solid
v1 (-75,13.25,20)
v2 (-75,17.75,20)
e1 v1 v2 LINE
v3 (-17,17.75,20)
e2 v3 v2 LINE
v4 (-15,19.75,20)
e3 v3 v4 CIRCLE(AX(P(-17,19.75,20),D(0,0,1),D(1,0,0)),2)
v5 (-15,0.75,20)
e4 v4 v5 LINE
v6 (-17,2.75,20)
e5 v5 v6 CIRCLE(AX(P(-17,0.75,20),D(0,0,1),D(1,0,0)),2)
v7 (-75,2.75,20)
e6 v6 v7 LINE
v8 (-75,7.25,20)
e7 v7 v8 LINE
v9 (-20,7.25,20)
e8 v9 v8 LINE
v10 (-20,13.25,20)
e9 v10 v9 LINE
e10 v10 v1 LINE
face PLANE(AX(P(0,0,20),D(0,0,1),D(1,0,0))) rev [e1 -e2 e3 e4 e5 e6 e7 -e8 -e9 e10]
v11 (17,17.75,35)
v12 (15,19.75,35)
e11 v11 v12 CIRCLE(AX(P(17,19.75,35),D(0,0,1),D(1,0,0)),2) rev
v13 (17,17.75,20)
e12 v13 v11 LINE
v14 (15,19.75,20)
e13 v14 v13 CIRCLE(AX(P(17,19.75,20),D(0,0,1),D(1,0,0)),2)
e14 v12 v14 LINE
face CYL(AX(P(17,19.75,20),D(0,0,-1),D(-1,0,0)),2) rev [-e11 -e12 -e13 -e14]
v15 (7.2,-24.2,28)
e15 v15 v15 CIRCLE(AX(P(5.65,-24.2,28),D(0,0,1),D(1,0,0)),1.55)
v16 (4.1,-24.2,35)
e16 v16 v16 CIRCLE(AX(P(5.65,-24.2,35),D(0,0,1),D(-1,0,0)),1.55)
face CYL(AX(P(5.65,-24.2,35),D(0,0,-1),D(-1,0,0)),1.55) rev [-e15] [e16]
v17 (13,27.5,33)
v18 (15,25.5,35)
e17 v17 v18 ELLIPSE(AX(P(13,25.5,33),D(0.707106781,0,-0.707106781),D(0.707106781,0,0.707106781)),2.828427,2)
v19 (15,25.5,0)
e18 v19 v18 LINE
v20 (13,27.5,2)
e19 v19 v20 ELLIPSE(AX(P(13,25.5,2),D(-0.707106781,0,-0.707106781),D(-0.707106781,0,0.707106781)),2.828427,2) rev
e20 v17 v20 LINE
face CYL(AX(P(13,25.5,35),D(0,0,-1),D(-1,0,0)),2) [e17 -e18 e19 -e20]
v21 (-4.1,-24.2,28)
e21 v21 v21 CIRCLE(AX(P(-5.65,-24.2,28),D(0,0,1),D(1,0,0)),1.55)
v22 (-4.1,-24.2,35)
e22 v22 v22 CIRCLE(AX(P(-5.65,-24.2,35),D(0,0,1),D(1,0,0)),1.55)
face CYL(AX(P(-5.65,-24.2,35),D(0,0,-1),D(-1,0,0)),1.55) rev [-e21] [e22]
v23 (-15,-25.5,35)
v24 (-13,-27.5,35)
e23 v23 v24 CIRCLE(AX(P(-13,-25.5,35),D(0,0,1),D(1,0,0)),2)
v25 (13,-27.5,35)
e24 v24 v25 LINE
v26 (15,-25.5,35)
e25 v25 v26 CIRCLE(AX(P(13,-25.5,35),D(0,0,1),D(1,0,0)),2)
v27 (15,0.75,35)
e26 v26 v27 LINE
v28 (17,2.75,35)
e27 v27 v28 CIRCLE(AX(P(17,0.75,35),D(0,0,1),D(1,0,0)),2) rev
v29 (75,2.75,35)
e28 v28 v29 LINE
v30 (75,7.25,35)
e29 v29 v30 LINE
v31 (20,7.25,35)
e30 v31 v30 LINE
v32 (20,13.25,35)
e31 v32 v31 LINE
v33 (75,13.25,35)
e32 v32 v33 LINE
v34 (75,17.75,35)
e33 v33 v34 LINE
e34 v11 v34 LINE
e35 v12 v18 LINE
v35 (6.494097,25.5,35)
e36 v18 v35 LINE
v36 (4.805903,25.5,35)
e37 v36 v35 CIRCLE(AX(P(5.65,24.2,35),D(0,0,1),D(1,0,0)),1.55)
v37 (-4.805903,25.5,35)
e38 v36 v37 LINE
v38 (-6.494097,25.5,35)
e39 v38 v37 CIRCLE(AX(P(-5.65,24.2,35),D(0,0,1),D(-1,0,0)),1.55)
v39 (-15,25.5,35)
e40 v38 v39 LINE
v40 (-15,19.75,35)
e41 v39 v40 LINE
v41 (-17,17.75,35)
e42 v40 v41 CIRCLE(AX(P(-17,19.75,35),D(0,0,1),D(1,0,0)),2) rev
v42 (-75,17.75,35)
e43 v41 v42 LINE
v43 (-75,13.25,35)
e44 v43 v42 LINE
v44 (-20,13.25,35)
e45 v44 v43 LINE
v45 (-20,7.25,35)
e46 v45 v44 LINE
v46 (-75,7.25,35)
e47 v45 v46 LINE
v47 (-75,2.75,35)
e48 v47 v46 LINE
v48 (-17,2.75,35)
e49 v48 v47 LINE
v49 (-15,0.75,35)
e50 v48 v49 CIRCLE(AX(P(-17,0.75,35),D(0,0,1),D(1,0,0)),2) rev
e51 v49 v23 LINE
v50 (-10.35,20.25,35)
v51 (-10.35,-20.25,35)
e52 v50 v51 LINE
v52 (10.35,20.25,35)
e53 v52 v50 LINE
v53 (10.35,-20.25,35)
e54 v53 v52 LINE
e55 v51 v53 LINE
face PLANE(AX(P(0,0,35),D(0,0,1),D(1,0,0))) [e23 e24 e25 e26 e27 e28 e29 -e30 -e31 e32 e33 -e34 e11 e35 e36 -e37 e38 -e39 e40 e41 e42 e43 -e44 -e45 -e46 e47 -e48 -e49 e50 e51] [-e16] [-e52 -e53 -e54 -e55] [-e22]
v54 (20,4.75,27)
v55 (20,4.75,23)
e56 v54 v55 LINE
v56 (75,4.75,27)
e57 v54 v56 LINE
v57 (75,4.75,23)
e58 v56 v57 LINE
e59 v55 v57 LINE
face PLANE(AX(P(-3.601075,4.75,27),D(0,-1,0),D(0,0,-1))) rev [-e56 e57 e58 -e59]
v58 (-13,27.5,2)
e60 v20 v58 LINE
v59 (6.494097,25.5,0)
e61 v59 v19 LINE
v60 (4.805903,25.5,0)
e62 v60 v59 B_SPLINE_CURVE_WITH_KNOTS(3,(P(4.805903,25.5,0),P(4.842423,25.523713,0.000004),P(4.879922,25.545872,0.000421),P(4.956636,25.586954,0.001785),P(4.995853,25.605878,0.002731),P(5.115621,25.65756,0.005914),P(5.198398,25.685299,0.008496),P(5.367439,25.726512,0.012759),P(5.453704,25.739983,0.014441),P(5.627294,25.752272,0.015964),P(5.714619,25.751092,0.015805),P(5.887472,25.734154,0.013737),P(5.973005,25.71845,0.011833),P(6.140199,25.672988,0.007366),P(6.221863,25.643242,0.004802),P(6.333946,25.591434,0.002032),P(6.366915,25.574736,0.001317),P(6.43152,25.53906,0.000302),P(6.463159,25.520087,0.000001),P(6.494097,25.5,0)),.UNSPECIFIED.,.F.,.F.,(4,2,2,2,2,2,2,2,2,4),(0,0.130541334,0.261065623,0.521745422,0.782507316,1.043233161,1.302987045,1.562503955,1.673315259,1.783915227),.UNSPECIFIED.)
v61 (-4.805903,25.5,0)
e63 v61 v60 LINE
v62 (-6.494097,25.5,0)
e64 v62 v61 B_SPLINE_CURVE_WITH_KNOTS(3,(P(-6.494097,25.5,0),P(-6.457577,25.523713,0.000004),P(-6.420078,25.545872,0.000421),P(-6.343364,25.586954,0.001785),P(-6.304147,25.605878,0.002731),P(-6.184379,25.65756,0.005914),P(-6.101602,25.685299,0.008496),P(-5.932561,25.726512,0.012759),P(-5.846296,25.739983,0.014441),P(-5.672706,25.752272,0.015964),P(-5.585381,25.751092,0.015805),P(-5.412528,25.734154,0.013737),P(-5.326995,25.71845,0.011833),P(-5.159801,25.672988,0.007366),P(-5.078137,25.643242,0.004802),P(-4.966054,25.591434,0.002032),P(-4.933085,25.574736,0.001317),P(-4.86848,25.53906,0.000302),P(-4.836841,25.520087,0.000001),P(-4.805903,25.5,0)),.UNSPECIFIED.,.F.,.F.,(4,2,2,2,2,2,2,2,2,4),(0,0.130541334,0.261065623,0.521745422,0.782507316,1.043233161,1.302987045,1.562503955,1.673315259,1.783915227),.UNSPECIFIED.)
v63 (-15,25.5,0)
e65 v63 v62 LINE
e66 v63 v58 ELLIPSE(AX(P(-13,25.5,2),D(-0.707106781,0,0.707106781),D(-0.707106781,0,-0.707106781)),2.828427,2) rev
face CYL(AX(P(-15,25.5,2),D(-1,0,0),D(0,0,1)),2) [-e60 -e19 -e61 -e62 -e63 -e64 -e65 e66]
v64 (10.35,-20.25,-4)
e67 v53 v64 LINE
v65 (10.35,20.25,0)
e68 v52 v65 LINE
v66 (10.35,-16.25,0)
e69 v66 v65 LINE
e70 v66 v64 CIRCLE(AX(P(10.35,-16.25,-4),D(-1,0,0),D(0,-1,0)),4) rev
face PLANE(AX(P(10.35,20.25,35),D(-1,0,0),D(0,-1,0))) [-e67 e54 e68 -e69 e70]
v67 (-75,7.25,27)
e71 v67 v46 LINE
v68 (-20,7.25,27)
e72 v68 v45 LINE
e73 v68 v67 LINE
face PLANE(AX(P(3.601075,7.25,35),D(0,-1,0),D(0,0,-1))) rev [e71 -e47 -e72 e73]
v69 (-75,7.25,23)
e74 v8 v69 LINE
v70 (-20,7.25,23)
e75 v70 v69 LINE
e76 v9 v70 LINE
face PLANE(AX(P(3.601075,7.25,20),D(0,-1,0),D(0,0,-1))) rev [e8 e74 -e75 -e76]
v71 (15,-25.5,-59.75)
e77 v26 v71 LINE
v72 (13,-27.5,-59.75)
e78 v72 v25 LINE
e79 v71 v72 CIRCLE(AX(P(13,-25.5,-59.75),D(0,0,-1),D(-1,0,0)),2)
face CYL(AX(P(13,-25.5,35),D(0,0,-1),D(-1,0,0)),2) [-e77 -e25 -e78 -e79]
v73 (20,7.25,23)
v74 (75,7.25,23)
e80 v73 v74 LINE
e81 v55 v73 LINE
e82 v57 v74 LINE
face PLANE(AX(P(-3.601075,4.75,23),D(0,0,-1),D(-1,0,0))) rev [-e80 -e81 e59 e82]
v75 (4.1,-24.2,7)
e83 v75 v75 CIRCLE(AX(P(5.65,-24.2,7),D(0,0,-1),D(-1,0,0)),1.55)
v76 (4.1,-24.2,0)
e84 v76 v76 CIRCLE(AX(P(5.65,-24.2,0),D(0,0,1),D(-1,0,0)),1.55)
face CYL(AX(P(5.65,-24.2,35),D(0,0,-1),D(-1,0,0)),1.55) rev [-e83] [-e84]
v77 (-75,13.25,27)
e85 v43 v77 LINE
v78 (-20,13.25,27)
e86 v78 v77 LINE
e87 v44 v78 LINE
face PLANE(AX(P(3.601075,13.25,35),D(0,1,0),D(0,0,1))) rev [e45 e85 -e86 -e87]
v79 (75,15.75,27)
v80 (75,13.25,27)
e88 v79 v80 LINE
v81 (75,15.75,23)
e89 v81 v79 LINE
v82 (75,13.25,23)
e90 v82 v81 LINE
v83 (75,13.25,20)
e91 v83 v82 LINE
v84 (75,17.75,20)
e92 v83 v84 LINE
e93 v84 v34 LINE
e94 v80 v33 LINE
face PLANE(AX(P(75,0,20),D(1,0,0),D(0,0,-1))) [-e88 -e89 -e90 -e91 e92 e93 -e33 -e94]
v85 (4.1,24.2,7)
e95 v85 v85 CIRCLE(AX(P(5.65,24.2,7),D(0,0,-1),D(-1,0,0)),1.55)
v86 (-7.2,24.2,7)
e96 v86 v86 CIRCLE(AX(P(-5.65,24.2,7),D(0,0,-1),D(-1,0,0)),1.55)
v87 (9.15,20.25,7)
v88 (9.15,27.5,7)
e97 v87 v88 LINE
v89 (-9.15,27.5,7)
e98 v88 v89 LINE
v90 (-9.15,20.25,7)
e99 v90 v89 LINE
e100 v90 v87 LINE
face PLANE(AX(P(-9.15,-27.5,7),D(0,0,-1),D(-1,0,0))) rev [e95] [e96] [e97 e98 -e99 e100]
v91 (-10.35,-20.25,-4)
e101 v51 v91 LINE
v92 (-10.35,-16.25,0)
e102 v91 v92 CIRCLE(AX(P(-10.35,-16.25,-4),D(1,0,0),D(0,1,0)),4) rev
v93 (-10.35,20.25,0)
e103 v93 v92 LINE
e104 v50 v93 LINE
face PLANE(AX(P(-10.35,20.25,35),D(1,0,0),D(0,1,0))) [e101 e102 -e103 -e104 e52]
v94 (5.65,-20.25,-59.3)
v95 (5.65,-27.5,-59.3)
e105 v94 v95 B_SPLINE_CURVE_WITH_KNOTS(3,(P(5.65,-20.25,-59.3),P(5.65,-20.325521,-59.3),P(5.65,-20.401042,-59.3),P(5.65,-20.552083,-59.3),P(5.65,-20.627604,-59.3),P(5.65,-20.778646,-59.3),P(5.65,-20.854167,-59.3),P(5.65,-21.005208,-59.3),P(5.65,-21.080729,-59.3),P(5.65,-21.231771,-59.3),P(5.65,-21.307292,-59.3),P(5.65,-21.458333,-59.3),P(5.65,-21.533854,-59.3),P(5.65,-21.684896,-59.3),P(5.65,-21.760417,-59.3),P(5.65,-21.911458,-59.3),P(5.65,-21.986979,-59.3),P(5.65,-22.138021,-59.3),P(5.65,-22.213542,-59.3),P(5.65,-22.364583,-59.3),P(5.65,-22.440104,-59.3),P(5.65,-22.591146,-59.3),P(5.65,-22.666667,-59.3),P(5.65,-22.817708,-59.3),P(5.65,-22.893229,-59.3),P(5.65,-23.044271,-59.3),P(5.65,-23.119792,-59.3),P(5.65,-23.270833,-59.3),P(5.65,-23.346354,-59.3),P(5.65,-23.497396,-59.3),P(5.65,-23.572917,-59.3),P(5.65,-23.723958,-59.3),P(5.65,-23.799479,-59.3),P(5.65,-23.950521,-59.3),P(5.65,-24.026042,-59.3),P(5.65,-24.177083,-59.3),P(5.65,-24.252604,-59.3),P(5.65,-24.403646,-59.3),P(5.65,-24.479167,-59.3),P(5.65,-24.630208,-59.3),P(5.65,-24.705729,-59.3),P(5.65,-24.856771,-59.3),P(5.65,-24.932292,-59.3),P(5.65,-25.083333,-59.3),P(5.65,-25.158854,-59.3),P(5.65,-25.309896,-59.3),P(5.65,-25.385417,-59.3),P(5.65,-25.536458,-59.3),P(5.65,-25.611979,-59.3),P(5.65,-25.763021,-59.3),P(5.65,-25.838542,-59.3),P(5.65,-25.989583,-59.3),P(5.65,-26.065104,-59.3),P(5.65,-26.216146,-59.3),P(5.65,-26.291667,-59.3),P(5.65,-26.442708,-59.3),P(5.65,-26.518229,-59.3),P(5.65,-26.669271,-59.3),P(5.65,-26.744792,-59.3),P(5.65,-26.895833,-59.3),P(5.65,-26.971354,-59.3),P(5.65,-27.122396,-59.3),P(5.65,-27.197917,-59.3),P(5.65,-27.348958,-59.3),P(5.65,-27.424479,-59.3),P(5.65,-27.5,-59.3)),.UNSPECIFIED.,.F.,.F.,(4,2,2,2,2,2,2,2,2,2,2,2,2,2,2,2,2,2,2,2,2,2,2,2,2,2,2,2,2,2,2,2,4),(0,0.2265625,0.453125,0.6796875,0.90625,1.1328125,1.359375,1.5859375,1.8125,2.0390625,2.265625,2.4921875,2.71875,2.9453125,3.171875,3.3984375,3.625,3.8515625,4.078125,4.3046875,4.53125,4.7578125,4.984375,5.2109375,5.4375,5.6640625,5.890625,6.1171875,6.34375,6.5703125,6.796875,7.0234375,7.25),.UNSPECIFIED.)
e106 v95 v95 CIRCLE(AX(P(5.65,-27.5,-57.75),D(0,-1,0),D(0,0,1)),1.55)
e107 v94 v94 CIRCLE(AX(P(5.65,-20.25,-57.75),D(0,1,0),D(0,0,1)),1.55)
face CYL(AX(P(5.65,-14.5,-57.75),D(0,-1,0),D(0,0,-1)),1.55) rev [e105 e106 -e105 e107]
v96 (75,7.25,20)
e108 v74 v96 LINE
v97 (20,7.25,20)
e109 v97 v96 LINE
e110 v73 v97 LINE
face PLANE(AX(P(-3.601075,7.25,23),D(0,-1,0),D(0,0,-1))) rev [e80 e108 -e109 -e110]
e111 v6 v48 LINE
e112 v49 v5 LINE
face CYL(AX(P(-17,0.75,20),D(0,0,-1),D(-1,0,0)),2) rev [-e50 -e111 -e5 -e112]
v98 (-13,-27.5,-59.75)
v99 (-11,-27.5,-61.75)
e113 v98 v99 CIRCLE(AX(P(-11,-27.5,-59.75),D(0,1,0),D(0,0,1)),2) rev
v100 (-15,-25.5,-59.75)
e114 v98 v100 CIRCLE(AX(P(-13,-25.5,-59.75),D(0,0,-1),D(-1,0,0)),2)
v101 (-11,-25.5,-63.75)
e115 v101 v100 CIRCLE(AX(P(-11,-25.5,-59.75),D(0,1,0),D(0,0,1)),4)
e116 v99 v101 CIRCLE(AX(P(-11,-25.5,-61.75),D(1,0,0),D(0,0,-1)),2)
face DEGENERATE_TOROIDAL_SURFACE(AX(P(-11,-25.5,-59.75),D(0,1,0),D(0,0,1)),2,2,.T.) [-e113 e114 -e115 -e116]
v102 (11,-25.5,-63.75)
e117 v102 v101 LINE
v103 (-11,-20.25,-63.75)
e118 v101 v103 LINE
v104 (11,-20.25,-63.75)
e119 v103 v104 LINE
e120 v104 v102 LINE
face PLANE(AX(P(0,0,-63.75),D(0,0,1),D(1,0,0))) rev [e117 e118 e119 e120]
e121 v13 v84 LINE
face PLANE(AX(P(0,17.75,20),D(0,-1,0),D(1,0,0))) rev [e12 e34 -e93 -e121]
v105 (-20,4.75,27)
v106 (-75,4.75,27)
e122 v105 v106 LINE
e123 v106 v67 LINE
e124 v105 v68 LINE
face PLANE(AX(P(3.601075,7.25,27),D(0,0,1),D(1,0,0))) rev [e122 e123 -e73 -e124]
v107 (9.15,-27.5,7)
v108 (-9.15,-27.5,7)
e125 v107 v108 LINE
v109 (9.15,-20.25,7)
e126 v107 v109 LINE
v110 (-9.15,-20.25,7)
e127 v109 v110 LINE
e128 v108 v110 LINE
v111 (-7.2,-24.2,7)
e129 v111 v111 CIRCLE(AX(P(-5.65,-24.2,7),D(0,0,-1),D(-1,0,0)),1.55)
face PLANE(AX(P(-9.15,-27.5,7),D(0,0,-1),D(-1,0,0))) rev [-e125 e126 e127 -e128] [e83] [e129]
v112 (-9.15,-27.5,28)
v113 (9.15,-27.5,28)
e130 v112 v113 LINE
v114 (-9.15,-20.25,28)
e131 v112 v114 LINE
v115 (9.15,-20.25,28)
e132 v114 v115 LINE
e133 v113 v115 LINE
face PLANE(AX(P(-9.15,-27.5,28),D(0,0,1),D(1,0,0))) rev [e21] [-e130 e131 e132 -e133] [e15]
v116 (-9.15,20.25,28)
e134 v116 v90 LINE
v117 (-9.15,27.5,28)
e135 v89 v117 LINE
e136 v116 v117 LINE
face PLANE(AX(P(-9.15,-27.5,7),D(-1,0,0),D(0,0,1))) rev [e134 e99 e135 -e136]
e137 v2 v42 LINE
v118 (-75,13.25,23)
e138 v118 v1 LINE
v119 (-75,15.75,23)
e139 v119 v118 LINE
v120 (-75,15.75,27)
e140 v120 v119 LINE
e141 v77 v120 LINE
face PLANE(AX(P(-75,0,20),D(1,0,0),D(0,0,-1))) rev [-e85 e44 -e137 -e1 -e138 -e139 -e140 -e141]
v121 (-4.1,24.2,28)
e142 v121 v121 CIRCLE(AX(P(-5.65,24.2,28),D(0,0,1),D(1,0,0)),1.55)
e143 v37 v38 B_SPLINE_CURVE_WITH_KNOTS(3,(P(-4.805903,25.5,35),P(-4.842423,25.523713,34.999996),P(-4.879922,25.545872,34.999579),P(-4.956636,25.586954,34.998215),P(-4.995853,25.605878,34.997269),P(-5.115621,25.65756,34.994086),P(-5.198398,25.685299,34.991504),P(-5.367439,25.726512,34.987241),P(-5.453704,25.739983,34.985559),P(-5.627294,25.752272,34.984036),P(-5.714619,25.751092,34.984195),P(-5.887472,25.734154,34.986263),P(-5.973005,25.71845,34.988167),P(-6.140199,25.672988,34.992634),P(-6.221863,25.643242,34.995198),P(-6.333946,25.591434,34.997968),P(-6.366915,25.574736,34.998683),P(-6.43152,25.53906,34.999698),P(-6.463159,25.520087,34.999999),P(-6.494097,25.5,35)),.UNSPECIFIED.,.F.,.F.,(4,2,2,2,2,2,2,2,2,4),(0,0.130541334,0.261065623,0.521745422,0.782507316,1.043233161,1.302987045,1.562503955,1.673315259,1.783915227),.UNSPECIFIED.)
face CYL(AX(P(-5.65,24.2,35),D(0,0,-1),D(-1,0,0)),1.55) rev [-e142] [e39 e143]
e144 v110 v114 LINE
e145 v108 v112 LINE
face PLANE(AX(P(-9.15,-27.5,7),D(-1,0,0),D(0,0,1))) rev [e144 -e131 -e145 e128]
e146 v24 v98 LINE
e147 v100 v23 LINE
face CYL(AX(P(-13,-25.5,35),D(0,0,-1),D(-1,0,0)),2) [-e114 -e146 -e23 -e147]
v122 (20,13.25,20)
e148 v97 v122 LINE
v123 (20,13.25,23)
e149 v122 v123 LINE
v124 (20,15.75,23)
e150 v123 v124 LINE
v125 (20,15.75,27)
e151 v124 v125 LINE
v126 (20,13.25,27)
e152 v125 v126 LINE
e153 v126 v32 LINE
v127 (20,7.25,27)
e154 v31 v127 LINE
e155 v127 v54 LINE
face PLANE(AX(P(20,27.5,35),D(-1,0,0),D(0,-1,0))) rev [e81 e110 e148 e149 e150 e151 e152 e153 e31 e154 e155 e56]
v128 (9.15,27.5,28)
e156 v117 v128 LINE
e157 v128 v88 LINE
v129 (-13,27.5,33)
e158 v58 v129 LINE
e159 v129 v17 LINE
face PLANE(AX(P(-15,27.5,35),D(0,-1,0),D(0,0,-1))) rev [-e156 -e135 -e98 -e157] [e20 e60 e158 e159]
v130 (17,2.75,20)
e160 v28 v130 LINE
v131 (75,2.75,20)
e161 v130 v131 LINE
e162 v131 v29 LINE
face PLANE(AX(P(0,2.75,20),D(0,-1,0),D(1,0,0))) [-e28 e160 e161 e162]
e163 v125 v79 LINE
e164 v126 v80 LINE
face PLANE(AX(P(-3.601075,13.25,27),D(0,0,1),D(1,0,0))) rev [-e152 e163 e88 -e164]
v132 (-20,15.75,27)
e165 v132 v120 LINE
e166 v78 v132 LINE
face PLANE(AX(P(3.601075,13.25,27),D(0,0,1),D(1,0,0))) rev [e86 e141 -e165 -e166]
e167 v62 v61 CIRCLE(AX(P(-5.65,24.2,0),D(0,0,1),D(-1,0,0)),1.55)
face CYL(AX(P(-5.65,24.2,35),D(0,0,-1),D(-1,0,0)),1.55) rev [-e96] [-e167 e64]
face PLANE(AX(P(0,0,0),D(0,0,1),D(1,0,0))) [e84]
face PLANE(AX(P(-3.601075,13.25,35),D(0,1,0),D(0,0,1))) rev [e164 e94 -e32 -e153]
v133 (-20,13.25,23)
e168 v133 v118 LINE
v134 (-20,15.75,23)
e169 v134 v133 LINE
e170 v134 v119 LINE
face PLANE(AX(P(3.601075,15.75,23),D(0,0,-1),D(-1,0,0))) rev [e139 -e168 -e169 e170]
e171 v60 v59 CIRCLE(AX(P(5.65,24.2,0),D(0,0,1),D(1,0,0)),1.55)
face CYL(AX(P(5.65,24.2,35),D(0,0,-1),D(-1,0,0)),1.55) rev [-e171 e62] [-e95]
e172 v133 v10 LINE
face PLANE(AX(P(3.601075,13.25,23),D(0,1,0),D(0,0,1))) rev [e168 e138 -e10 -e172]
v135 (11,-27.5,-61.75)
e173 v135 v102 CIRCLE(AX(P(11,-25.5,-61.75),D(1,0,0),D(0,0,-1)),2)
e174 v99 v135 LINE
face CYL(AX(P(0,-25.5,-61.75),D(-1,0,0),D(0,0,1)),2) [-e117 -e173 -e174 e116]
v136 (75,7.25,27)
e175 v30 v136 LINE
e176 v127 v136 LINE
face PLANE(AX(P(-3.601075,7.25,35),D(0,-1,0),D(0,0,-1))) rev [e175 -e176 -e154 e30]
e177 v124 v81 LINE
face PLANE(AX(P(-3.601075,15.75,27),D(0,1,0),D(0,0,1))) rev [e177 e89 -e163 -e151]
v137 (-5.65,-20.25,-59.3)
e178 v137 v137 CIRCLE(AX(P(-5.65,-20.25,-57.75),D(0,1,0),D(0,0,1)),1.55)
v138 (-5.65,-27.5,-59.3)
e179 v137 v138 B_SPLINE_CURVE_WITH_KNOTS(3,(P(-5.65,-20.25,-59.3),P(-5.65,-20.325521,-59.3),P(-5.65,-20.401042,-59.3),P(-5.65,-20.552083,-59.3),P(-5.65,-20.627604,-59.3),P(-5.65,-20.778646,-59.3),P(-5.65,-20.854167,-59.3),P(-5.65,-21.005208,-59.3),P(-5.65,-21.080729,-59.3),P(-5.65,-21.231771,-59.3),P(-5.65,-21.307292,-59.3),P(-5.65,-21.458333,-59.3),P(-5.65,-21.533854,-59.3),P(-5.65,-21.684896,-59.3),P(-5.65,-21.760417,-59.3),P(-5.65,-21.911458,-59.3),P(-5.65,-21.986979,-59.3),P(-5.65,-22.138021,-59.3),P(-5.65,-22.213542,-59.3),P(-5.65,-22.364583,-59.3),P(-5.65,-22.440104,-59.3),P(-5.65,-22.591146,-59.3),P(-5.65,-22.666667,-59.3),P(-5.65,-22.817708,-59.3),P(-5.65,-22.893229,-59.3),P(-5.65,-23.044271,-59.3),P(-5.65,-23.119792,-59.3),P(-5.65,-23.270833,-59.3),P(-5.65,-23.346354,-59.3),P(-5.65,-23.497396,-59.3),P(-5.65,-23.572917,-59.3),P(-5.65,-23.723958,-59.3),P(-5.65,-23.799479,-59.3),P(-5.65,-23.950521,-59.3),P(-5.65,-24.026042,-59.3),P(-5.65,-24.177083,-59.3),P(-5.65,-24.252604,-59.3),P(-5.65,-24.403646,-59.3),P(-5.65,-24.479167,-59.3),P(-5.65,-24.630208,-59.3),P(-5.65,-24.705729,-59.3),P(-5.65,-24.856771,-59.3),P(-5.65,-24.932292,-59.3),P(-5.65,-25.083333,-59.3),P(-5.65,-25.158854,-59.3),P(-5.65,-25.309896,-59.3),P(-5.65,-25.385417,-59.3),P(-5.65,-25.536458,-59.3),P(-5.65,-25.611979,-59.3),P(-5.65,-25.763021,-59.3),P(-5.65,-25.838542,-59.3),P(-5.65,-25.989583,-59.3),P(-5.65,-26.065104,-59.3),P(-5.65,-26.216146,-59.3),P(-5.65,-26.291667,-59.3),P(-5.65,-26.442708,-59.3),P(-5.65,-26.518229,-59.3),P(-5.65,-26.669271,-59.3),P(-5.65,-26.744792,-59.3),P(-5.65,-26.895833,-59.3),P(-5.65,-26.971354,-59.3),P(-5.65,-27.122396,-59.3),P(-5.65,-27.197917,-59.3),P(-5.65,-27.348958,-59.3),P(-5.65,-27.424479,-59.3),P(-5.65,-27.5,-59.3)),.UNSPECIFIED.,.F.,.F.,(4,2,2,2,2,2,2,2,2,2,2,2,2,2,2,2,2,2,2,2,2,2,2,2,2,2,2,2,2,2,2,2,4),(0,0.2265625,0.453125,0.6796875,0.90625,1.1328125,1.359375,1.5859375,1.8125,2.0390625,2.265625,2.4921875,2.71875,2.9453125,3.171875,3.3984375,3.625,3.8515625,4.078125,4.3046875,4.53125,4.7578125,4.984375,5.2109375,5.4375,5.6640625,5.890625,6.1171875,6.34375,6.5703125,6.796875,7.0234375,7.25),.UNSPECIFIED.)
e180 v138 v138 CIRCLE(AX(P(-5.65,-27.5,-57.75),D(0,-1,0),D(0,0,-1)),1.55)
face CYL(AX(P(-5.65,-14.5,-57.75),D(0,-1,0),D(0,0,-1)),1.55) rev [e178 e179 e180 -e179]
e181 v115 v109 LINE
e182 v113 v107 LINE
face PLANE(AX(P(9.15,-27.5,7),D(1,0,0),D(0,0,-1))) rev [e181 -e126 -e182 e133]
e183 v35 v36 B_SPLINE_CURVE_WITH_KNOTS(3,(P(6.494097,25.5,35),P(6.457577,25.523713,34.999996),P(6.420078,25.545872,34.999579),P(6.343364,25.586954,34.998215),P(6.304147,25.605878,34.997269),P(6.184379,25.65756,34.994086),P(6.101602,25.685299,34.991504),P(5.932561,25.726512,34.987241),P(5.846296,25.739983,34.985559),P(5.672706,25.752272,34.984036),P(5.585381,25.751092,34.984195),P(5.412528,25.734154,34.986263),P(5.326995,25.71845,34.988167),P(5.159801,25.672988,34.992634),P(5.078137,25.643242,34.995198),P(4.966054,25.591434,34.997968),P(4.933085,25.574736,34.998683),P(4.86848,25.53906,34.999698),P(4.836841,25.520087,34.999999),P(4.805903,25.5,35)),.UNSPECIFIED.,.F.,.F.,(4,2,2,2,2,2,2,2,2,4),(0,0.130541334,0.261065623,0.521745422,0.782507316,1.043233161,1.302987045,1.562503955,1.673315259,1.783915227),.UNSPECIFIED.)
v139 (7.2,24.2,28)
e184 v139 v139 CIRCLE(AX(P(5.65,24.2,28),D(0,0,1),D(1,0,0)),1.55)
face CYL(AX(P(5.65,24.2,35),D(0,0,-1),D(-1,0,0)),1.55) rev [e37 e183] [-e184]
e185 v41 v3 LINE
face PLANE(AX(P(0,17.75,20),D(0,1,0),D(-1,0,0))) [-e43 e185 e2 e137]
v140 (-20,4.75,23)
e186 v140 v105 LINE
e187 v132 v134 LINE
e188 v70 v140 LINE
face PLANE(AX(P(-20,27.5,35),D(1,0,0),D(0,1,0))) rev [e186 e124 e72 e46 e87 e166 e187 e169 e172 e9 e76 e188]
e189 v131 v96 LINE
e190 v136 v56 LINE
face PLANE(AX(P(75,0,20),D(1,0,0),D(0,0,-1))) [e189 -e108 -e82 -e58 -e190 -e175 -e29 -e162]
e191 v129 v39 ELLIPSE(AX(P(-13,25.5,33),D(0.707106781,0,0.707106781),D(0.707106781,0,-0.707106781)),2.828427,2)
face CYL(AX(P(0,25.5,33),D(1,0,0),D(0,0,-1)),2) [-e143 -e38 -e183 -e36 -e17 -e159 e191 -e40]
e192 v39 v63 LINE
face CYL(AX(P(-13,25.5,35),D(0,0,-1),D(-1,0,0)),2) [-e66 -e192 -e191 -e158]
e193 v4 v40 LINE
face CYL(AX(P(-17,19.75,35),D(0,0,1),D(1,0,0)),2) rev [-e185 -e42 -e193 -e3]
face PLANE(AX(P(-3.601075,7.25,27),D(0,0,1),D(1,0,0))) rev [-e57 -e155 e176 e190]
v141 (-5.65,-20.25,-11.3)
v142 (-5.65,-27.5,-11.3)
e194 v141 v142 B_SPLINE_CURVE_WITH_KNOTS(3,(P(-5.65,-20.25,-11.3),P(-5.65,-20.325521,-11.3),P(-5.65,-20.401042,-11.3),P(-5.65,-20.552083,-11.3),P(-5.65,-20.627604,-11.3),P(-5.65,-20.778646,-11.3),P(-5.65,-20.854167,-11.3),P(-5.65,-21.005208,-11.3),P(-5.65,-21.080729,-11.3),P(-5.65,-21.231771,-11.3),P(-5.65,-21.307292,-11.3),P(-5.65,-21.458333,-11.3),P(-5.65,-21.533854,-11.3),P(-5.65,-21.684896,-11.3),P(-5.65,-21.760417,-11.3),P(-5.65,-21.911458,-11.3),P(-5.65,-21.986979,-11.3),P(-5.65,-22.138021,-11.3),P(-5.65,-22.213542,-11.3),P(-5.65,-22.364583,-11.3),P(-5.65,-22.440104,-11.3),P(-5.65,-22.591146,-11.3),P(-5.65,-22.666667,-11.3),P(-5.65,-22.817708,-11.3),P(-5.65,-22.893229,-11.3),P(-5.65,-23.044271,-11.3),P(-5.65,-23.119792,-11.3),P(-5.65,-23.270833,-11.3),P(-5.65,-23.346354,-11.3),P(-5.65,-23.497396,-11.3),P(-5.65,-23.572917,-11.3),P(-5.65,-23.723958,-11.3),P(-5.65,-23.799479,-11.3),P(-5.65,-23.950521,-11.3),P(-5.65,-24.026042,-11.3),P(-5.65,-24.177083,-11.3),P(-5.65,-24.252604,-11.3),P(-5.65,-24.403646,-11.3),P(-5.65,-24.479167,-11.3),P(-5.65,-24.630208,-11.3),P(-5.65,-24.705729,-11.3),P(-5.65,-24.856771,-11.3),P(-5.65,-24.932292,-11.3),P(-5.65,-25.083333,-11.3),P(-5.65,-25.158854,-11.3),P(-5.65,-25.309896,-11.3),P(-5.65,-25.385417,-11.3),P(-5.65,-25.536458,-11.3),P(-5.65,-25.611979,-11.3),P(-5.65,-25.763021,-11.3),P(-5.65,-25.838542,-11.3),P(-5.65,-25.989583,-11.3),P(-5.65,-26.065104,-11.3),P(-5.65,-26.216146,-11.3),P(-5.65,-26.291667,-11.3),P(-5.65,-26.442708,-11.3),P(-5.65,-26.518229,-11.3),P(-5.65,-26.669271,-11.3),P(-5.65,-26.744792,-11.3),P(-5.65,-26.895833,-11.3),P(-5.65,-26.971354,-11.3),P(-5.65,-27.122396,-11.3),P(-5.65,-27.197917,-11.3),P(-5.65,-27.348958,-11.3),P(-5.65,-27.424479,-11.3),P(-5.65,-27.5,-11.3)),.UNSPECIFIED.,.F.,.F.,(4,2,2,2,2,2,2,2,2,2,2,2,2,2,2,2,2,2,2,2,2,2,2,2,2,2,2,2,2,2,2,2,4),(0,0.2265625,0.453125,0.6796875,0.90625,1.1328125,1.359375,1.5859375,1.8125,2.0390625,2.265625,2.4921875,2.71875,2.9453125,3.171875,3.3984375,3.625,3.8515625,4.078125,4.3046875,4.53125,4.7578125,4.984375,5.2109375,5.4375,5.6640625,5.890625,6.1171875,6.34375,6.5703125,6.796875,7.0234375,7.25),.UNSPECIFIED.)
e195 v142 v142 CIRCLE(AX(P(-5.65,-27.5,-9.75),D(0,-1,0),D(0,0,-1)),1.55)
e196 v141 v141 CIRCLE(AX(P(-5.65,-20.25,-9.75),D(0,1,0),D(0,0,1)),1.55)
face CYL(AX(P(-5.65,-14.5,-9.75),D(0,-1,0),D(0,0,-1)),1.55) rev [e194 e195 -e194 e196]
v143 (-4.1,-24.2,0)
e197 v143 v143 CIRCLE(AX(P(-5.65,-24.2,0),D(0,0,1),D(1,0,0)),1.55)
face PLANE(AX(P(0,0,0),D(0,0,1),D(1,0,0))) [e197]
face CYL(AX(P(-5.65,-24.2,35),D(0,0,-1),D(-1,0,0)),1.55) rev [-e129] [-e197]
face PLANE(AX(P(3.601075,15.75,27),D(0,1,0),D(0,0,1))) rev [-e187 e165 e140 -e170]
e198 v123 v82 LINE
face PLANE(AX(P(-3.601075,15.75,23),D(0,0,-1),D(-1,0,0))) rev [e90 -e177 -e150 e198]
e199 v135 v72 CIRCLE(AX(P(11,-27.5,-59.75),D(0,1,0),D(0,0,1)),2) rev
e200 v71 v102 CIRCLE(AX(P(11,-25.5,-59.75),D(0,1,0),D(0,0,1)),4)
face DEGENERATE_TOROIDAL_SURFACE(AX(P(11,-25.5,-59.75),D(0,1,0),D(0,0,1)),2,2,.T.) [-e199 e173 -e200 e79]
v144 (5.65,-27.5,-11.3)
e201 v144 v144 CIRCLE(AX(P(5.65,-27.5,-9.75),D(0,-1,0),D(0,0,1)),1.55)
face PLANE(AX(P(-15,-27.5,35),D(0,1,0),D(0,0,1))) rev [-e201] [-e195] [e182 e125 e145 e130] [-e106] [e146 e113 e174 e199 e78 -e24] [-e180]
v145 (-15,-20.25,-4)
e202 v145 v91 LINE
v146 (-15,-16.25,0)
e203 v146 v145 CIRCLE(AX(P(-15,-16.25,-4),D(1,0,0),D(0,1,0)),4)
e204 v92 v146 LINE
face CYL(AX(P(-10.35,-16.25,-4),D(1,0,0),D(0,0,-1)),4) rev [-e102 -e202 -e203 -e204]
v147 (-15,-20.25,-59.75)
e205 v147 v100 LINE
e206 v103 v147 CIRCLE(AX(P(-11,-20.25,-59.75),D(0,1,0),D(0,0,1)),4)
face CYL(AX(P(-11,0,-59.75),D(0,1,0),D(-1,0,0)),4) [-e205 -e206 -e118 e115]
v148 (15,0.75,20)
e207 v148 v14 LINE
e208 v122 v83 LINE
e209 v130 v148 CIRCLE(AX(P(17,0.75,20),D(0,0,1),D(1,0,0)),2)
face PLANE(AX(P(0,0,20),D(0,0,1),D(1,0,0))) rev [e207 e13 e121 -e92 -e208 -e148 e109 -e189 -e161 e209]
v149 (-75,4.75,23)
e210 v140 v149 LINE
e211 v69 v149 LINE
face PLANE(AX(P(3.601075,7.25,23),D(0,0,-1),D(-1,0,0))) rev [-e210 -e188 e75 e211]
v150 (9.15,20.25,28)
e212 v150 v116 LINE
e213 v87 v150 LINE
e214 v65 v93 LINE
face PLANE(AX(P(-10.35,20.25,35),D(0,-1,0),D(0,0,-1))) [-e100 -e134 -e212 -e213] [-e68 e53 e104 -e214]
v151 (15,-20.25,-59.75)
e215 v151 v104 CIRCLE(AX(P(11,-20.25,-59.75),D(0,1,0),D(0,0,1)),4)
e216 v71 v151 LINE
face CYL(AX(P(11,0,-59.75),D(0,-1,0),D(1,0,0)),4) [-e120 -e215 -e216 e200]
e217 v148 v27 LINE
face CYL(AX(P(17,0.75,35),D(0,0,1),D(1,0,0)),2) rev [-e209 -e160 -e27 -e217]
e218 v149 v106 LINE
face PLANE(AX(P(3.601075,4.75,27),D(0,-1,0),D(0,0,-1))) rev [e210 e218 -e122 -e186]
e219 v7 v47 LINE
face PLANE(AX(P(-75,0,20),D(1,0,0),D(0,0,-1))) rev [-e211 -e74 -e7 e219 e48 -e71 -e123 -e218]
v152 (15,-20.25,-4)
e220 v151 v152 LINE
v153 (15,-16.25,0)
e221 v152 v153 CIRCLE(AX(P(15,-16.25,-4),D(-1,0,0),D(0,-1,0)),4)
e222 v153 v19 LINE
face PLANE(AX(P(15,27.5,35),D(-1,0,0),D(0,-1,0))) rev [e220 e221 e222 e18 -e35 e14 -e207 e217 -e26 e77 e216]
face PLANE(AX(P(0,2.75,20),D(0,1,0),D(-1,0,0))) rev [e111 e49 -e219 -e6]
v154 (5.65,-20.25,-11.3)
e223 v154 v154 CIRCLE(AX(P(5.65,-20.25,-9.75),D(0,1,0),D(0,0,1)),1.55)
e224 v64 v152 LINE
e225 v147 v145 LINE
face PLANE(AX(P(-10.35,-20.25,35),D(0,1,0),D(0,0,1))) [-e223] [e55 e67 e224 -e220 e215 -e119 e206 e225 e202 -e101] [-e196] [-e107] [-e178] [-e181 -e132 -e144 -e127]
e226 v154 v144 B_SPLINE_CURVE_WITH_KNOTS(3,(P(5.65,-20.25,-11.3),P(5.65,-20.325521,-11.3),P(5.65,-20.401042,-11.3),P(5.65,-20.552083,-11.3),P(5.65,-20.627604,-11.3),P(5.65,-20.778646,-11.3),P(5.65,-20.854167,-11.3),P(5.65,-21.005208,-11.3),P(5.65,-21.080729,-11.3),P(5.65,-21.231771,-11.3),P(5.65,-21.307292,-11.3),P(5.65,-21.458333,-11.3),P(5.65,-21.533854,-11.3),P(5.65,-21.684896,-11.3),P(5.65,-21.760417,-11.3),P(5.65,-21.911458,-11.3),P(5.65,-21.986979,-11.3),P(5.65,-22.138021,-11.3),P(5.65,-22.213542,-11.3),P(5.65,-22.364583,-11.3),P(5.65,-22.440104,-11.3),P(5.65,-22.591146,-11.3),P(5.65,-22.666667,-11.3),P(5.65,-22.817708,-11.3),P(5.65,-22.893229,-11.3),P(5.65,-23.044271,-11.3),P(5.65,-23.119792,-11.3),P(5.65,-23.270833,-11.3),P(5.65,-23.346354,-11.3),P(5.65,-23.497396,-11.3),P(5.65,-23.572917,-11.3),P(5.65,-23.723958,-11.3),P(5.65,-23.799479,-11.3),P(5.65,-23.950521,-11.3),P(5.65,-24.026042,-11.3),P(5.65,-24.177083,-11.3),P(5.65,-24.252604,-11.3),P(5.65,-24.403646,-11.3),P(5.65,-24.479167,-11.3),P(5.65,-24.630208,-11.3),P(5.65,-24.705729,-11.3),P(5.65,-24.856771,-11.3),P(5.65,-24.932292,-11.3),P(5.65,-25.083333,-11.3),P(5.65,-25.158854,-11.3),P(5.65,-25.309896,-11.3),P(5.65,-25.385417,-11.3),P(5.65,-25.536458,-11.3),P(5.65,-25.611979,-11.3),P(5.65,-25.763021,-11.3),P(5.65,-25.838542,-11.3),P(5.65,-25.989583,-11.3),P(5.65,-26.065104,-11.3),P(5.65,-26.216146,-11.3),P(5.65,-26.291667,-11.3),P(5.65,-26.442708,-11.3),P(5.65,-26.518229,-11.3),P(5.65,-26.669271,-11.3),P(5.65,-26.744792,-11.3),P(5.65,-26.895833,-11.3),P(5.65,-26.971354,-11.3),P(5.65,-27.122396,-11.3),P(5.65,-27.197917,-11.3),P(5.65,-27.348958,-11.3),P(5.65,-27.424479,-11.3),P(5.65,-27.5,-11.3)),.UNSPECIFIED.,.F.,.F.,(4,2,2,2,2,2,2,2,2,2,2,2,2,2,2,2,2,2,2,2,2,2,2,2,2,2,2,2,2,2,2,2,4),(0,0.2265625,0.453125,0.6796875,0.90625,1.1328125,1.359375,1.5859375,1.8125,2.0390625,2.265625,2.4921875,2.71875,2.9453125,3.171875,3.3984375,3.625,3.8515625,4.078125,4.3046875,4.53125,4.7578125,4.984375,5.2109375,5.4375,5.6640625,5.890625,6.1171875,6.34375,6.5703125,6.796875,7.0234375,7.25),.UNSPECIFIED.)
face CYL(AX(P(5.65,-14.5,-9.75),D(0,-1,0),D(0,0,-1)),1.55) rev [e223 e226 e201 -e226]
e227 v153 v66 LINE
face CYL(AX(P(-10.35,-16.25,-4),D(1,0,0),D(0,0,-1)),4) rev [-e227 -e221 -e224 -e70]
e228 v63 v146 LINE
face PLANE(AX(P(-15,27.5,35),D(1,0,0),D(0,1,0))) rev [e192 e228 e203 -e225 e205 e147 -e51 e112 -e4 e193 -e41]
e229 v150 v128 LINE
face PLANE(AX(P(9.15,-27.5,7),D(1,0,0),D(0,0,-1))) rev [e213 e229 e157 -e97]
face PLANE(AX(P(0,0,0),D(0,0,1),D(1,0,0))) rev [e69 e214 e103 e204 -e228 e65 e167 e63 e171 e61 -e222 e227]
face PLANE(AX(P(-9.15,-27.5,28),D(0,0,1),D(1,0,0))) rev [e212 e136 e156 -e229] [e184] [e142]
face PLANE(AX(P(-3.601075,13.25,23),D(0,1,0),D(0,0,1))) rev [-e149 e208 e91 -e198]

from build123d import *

# Parameters (mm, degrees)
SKETCH1_W           = 30
SKETCH1_H           = 55
SKETCH1_R           = 1.55
SKETCH1_W_2         = 20.7
SKETCH1_H_2         = 40.5
BOSS_EXTRUDE1_DEPTH = 35
SKETCH11_W          = 30
SKETCH11_H          = 7.25
BOSS_EXTRUDE5_DEPTH = 63.75
SKETCH12_R          = 1.55
CUT_EXTRUDE2_DEPTH  = 13
LPATTERN2_COUNT     = 2
LPATTERN2_PITCH     = 48
FILLET1_R           = 4
SKETCH13_W          = 60
SKETCH13_H          = 15
BOSS_EXTRUDE6_DEPTH = 15
CUT_EXTRUDE3_DEPTH  = 55
CUT_EXTRUDE4_DEPTH  = 55
SKETCH18_W          = 18.3
SKETCH18_H          = 21
CUT_EXTRUDE5_DEPTH  = 113.756651688
FILLET6_R           = 2
FILLET7_R           = 2
FILLET8_R           = 2


with BuildPart() as part:
    # Sketch1 → Boss-Extrude1 (new body)
    with BuildSketch(Plane.XY):
        Rectangle(SKETCH1_W, SKETCH1_H)
        with Locations((5.65, 24.2)):
            Circle(SKETCH1_R, mode=Mode.SUBTRACT)
        with Locations(Location((-5.65, 24.2, 0), (0, 0, 180))):
            Circle(SKETCH1_R, mode=Mode.SUBTRACT)
        with Locations((-5.65, -24.2)):
            Circle(SKETCH1_R, mode=Mode.SUBTRACT)
        with Locations(Location((5.65, -24.2, 0), (0, 0, 180))):
            Circle(SKETCH1_R, mode=Mode.SUBTRACT)
        Rectangle(SKETCH1_W_2, SKETCH1_H_2, mode=Mode.SUBTRACT)
    extrude(amount=BOSS_EXTRUDE1_DEPTH)

    # Sketch11 → Boss-Extrude5 (add)
    with BuildSketch(Plane(origin=(0, 0, 0), x_dir=(-1, 0, 0), z_dir=(0, 0, -1))):
        with Locations((0, -23.875)):
            Rectangle(SKETCH11_W, SKETCH11_H)
    extrude(amount=BOSS_EXTRUDE5_DEPTH)

    # Sketch12 → Cut-Extrude2 (cut)
    with BuildSketch(Plane.XZ.offset(27.5)):
        with Locations(Location((-5.65, -57.75, 0), (0, 0, 270))):
            Circle(SKETCH12_R)
        with Locations(Location((5.65, -57.75, 0), (0, 0, 270))):
            Circle(SKETCH12_R)
    cut_extrude2 = extrude(amount=-CUT_EXTRUDE2_DEPTH, mode=Mode.SUBTRACT)

    # LPattern2: Cut-Extrude2 ×2
    with Locations(*[(0, 0, i * LPATTERN2_PITCH) for i in range(1, LPATTERN2_COUNT)]):
        add(cut_extrude2, mode=Mode.SUBTRACT)

    # Fillet1
    fillet1_edges = [part.edges().sort_by_distance(p)[0] for p in [
        (12.675, -20.25, 0),
        (-12.675, -20.25, 0),
        (15, -23.875, -63.75),
        (-15, -23.875, -63.75),
    ]]
    fillet(fillet1_edges, radius=FILLET1_R)

    # Sketch13 → Boss-Extrude6 (add)
    with BuildSketch(Plane.XY.offset(35)):
        with Locations((-45, 10.25)):
            Rectangle(SKETCH13_W, SKETCH13_H)
        with Locations((45, 10.25)):
            Rectangle(SKETCH13_W, SKETCH13_H)
    extrude(amount=-BOSS_EXTRUDE6_DEPTH)

    # Sketch14 → Cut-Extrude3 (cut)
    with BuildSketch(Plane(origin=(75, 0, 0), x_dir=(0, 0, -1), z_dir=(1, 0, 0))):
        Polygon((-35, 13.25), (-35, 7.25), (-27, 7.25), (-27, 4.75), (-23, 4.75), (-23, 7.25), (-20, 7.25), (-20, 13.25), (-23, 13.25), (-23, 15.75), (-27, 15.75), (-27, 13.25), align=None)
    extrude(amount=-CUT_EXTRUDE3_DEPTH, mode=Mode.SUBTRACT)

    # Sketch17 → Cut-Extrude4 (cut)
    with BuildSketch(Plane.ZY.offset(75)):
        Polygon((35, 7.25), (35, 13.25), (27, 13.25), (27, 15.75), (23, 15.75), (23, 13.25), (20, 13.25), (20, 7.25), (23, 7.25), (23, 4.75), (27, 4.75), (27, 7.25), align=None)
    extrude(amount=-CUT_EXTRUDE4_DEPTH, mode=Mode.SUBTRACT)

    # Sketch18 → Cut-Extrude5 (cut, through all)
    with BuildSketch(Plane(origin=(0, 27.5, 0), x_dir=(1, 0, 0), z_dir=(0, 1, 0))):
        with Locations((0, -17.5)):
            Rectangle(SKETCH18_W, SKETCH18_H)
    extrude(amount=-CUT_EXTRUDE5_DEPTH, mode=Mode.SUBTRACT)

    # Fillet6
    # the kernel refuses this fillet: 2 mm, written as the material it adds along each edge
    with BuildSketch(Plane(origin=(-15, 17.75, 35), x_dir=(0, 1, 0), z_dir=(0, 0, -1))) as fillet6_piece_1:
        with BuildLine():
            CenterArc((FILLET6_R, -FILLET6_R), FILLET6_R, 90, 90)
            Line((0, -FILLET6_R), (0, 0))
            Line((0, 0), (FILLET6_R, 0))
        make_face()
    extrude(amount=15)
    with BuildSketch(Plane(origin=(15, 17.75, 35), x_dir=(0, 1, 0), z_dir=(0, 0, -1))) as fillet6_piece_2:
        with BuildLine():
            CenterArc((FILLET6_R, FILLET6_R), FILLET6_R, 180, 90)
            Line((0, FILLET6_R), (0, 0))
            Line((0, 0), (FILLET6_R, 0))
        make_face()
    extrude(amount=15)
    # the kernel refuses this fillet: 2 mm, written as the material it takes off along each edge
    with BuildSketch(Plane(origin=(-20, 27.5, 0), x_dir=(0, 0, 1), z_dir=(1, 0, 0))) as fillet6_2_piece_1:
        with BuildLine():
            CenterArc((FILLET6_R, FILLET6_R), FILLET6_R, 180, 90)
            Line((0, FILLET6_R), (0, 0))
            Line((0, 0), (FILLET6_R, 0))
        make_face()
    extrude(amount=40, mode=Mode.SUBTRACT)
    with BuildSketch(Plane(origin=(-15, 27.5, -5), x_dir=(0, -1, 0), z_dir=(0, 0, 1)), Plane(origin=(15, 27.5, -5), x_dir=(-1, 0, 0), z_dir=(0, 0, 1))) as fillet6_2_piece_2:
        with BuildLine():
            CenterArc((FILLET6_R, FILLET6_R), FILLET6_R, 180, 90)
            Line((0, FILLET6_R), (0, 0))
            Line((0, 0), (FILLET6_R, 0))
        make_face()
    extrude(amount=45, mode=Mode.SUBTRACT)
    with BuildSketch(Plane(origin=(-20, 27.5, 35), x_dir=(0, 0, -1), z_dir=(1, 0, 0))) as fillet6_2_piece_3:
        with BuildLine():
            CenterArc((FILLET6_R, -FILLET6_R), FILLET6_R, 90, 90)
            Line((0, -FILLET6_R), (0, 0))
            Line((0, 0), (FILLET6_R, 0))
        make_face()
    extrude(amount=40, mode=Mode.SUBTRACT)

    # Fillet7
    fillet7_edges = [part.edges().sort_by_distance(p)[0] for p in [
        (-15, 2.75, 27.5),
        (15, 2.75, 27.5),
    ]]
    fillet(fillet7_edges, radius=FILLET7_R)

    # Fillet8
    fillet8_edges = [part.edges().sort_by_distance(p)[0] for p in [
        (15, -27.5, -12.375),
        (-15, -27.5, -12.375),
        (0, -27.5, -63.75),
        (-13.828427125, -27.5, -62.578427125),
        (13.828427125, -27.5, -62.578427125),
    ]]
    fillet(fillet8_edges, radius=FILLET8_R)


solid = part.part
